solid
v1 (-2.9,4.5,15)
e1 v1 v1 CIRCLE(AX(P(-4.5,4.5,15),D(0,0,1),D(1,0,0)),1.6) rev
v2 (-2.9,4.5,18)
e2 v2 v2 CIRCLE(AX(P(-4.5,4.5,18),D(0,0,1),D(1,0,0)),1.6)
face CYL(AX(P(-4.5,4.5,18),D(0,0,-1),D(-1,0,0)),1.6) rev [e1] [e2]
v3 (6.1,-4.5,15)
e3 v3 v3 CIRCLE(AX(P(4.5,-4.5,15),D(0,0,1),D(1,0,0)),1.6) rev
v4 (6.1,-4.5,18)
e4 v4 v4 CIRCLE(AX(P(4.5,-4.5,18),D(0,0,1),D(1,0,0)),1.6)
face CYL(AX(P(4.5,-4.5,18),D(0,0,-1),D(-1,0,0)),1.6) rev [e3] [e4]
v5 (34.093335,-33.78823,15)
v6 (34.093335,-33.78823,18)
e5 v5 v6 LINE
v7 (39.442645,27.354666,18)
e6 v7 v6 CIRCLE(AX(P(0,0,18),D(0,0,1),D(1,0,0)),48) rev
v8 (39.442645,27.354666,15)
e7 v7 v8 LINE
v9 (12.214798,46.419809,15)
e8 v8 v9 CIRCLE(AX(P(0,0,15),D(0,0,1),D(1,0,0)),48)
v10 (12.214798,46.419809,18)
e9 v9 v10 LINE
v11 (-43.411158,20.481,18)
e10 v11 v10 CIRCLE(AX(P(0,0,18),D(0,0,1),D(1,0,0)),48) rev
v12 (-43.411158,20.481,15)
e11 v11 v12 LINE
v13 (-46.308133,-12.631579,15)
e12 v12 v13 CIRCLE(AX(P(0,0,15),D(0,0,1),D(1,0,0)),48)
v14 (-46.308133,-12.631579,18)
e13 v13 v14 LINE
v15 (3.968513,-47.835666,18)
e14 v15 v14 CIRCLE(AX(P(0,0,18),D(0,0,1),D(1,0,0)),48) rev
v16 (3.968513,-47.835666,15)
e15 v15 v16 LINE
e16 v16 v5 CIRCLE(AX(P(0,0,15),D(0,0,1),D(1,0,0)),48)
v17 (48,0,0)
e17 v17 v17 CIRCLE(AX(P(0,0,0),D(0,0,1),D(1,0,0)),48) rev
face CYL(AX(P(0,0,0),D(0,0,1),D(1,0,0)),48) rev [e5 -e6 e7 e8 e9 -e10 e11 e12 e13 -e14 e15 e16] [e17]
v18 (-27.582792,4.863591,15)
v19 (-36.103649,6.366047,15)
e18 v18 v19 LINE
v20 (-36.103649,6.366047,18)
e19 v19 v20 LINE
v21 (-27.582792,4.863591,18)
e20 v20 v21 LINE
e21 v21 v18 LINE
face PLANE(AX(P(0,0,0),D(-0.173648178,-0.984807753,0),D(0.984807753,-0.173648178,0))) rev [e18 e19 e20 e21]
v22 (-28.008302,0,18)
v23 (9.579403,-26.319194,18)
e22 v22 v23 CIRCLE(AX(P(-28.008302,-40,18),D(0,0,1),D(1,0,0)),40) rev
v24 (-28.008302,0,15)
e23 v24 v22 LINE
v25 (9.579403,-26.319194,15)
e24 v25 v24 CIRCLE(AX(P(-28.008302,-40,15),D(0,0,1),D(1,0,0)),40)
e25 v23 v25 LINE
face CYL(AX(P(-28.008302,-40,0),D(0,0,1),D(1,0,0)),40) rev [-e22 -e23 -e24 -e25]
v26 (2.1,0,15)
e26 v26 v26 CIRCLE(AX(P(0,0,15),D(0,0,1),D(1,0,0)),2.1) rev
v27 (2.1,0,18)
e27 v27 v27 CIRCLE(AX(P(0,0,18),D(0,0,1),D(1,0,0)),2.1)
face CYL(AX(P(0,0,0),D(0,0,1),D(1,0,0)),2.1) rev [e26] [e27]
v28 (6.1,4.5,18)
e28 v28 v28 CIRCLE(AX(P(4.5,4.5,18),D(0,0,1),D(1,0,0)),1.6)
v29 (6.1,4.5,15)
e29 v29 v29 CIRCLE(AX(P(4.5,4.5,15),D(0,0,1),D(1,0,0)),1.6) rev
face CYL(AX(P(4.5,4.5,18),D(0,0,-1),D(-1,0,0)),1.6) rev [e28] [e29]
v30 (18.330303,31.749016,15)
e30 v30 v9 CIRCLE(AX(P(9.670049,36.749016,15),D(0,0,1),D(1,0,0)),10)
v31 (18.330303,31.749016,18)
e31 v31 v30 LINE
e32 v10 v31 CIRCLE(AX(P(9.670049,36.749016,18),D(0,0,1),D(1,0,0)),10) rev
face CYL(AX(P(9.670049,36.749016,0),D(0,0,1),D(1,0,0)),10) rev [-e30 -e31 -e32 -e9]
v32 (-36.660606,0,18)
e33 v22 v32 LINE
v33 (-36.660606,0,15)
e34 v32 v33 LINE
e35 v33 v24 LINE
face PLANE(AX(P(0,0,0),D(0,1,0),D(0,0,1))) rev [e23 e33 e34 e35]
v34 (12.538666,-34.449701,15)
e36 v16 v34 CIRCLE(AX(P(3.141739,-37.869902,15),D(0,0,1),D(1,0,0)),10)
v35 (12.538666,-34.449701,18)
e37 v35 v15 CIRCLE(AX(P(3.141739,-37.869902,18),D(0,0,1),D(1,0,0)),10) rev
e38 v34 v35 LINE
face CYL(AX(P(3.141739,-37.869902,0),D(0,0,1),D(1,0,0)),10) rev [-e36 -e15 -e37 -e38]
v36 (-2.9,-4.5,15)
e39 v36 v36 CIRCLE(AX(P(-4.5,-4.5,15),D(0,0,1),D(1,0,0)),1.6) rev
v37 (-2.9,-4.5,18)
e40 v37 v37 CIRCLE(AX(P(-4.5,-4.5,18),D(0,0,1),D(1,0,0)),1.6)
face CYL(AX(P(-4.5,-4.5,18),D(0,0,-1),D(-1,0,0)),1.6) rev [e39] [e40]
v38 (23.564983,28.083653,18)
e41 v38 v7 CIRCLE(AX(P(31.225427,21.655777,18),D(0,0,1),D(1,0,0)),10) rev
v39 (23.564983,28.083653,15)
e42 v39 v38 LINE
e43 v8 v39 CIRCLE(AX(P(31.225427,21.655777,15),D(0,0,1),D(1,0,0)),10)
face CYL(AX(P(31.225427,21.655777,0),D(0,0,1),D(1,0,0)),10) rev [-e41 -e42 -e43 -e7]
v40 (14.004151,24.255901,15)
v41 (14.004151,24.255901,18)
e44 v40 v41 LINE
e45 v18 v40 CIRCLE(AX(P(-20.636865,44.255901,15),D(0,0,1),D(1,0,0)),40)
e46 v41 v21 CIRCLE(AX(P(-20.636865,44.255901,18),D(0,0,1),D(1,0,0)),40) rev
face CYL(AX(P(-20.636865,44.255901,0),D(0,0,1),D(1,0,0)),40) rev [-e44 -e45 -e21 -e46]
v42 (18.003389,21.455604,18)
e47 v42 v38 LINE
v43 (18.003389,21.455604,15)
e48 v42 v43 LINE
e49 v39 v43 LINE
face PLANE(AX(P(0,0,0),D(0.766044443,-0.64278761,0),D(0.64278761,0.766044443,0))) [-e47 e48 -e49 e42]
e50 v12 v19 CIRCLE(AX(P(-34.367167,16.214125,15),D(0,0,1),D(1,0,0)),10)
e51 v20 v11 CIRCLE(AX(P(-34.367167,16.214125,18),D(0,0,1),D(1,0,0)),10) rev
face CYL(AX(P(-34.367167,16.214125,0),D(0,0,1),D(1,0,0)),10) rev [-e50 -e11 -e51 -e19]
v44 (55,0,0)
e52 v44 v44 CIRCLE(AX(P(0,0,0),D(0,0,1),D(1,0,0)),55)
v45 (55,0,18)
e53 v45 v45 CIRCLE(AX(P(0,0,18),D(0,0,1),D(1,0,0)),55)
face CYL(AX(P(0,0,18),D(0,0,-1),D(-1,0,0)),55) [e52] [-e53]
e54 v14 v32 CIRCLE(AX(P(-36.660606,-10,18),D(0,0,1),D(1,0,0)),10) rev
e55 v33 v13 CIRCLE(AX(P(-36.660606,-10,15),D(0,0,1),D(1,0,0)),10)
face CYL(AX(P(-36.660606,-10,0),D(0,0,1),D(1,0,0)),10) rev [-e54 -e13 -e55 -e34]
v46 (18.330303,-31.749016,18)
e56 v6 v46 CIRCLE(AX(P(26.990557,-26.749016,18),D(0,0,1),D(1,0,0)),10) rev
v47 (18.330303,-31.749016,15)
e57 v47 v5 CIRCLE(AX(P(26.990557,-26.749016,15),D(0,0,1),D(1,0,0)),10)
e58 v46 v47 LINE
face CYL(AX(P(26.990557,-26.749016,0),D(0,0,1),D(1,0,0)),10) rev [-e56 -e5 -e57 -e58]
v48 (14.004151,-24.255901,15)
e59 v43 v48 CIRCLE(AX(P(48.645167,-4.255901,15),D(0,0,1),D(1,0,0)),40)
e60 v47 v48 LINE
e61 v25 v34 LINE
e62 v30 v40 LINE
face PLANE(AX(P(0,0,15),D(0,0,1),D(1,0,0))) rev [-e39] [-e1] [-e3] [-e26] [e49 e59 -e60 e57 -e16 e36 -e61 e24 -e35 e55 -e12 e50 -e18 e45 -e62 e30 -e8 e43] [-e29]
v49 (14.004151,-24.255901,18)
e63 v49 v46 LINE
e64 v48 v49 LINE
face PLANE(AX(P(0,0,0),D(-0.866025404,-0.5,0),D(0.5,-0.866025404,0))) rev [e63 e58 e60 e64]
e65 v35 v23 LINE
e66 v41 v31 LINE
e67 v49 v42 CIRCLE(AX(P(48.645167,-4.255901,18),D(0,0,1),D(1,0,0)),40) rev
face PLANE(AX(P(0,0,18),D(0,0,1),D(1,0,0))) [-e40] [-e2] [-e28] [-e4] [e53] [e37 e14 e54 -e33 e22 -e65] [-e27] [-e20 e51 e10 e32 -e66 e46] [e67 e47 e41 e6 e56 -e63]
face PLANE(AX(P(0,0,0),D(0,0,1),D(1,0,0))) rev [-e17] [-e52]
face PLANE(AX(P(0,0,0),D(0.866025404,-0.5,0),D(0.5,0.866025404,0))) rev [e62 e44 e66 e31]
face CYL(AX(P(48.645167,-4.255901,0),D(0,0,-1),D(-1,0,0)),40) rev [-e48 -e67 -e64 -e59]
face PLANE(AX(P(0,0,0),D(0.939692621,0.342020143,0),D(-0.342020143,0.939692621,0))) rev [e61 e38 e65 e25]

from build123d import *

# Parameters (mm, degrees)
ESQUISSE1_R             = 55
BOSS_EXTRU_1_DEPTH      = 18
ESQUISSE2_R             = 2.1
ENL_V_MAT_EXTRU_1_DEPTH = 80.837334625
ENL_V_MAT_EXTRU_2_DEPTH = 80.837334625
ENL_V_MAT_EXTRU_3_DEPTH = 80.837334625
ENL_V_START             = 15
ESQUISSE8_R             = 48
ENL_V_MAT_EXTRU_4_DEPTH = 15
CONG_3_R                = 10
CONG_4_R                = 10
CONG_5_R                = 60
CONG_7_R                = 40
ESQUISSE10_R            = 1.6
ENL_V_MAT_EXTRU_9_DEPTH = 80.837334785


with BuildPart() as part:
    # Esquisse1 → Boss.-Extru.1 (new body)
    with BuildSketch(Plane.XY):
        Circle(ESQUISSE1_R)
    extrude(amount=BOSS_EXTRU_1_DEPTH)

    # Esquisse2 → Enlèv. mat.-Extru.1 (cut, through all)
    with BuildSketch(Plane.XY.offset(18)):
        Circle(ESQUISSE2_R)
    extrude(amount=-ENL_V_MAT_EXTRU_1_DEPTH, mode=Mode.SUBTRACT)

    # Esquisse3 → Enlèv. mat.-Extru.2 (cut, through all)
    with BuildSketch(Plane.XY.offset(18)):
        with BuildLine():
            ThreePointArc((-7.5, 0), (-4.301823273, -6.143640332), (2.565151075, -7.047694656))
            Line((2.565151075, -7.047694656), (16.41696688, -45.105245798))
            ThreePointArc((16.41696688, -45.105245798), (-27.531668945, -39.319298126), (-48, 0))
            Line((-48, 0), (-7.5, 0))
        make_face()
        with BuildLine():
            ThreePointArc((-47.270772145, 8.335112528), (-20.285676564, 43.502773778), (24, 41.569219382))
            Line((24, 41.569219382), (3.75, 6.495190528))
            ThreePointArc((3.75, 6.495190528), (-3.169636963, 6.797308403), (-7.386058148, 1.302361333))
            Line((-7.386058148, 1.302361333), (-47.270772145, 8.335112528))
        make_face()
        with BuildLine():
            ThreePointArc((30.853805265, 36.77013327), (47.817345508, -4.183475652), (24, -41.569219382))
            Line((24, -41.569219382), (3.75, -6.495190528))
            ThreePointArc((3.75, -6.495190528), (7.471460236, -0.653668071), (4.820907073, 5.745333323))
            Line((4.820907073, 5.745333323), (30.853805265, 36.77013327))
        make_face()
    extrude(amount=-ENL_V_MAT_EXTRU_2_DEPTH, mode=Mode.SUBTRACT)

    # Esquisse7 → Enlèv. mat.-Extru.3 (cut, through all)
    with BuildSketch(Plane.XY):
        with BuildLine():
            Line((2.565151075, -7.047694656), (-27.531668945, -39.319298126))
            Line((-27.531668945, -39.319298126), (-7.5, 0))
            ThreePointArc((-7.5, 0), (-3.331557771, -4.75795759), (2.565151075, -7.047694656))
        make_face()
        with BuildLine():
            Line((4.820907073, 5.745333323), (47.817345508, -4.183475652))
            Line((47.817345508, -4.183475652), (3.75, -6.495190528))
            ThreePointArc((3.75, -6.495190528), (5.786291029, -0.506234869), (4.820907073, 5.745333323))
        make_face()
        with BuildLine():
            Line((3.75, 6.495190528), (-20.285676564, 43.502773778))
            Line((-20.285676564, 43.502773778), (-7.386058148, 1.302361333))
            ThreePointArc((-7.386058148, 1.302361333), (-2.454733258, 5.264192459), (3.75, 6.495190528))
        make_face()
    extrude(amount=ENL_V_MAT_EXTRU_3_DEPTH, mode=Mode.SUBTRACT)

    # Esquisse8 → Enlèv. mat.-Extru.4 (cut)
    with BuildSketch(Plane.XY.offset(ENL_V_START)):
        Circle(ESQUISSE8_R)
    extrude(amount=-ENL_V_MAT_EXTRU_4_DEPTH, mode=Mode.SUBTRACT)

    # Congé3
    # the kernel refuses this fillet: 10 mm, written as the material it adds along each edge
    with BuildSketch(Plane(origin=(-47.270772145, 8.335112528, 18), x_dir=(0.3028483404391726, 0.9530387624295452, 0), z_dir=(0, 0, -1))) as cong_3_piece_1:
        with BuildLine():
            CenterArc((11.416839641, 9.911490246), CONG_3_R, 172.371238355, 105.25752329)
            Line((1.505349395, 11.239029739), (0, 0))
            ThreePointArc((0, 0), (6.372189567, -0.42484682), (12.744379134, 0))
        make_face()
    extrude(amount=3)
    with BuildSketch(Plane(origin=(24, 41.569219382, 18), x_dir=(-0.9247372088845717, 0.38060621973947306, 0), z_dir=(0, 0, -1)), Plane(origin=(24, -41.569219382, 18), x_dir=(0.7919832595750325, 0.6105428048490187, 0), z_dir=(0, 0, -1)), Plane(origin=(-48, 0, 18), x_dir=(0.13275394930954024, -0.9911490245884924, 0), z_dir=(0, 0, -1))) as cong_3_piece_2:
        with BuildLine():
            CenterArc((11.416839641, -9.911490246), CONG_3_R, 82.371238355, 105.25752329)
            Line((1.505349395, -11.239029739), (0, 0))
            ThreePointArc((0, 0), (6.372189567, 0.42484682), (12.744379134, 0))
        make_face()
    extrude(amount=3)
    with BuildSketch(Plane(origin=(16.41696688, -45.105245798, 18), x_dir=(-0.34202014332566844, 0.9396926207859085, 0), z_dir=(0, 0, -1))) as cong_3_piece_3:
        with BuildLine():
            CenterArc((11.33939444, -10), CONG_3_R, 90, 105.25752329)
            ThreePointArc((1.691866661, -12.631578947), (0.42484682, -6.372189567), (0, 0))
            Line((0, 0), (11.33939444, 0))
        make_face()
    extrude(amount=3)

    # Congé4
    # the kernel refuses this fillet: 10 mm, written as the material it adds along each edge
    with BuildSketch(Plane(origin=(30.853805265, 36.77013327, 18), x_dir=(0.6739316088356829, -0.7387937375290534, 0), z_dir=(0, 0, -1))) as cong_4_piece_1:
        with BuildLine():
            CenterArc((11.416839641, 9.911490246), CONG_4_R, 172.371238355, 105.25752329)
            Line((1.505349395, 11.239029739), (0, 0))
            ThreePointArc((0, 0), (6.372189567, -0.42484682), (12.744379134, 0))
        make_face()
    extrude(amount=3)

    # Congé5
    # the kernel refuses this fillet: 60 mm, written as the material it adds along each edge
    with BuildSketch(Plane(origin=(-7.386058148, 1.302361333, 18), x_dir=(0.8285733508252506, 0.5598805250249523, 0), z_dir=(0, 0, -1)), Plane(origin=(2.565151075, -7.047694656, 18), x_dir=(-0.8991574331684032, 0.4376253082009868, 0), z_dir=(0, 0, -1))) as cong_5_piece_1:
        with BuildLine():
            CenterArc((27.479152806, -56.896321194), CONG_5_R, 108.509321534, 25.538214121)
            Line((-14.236143248, -13.770527577), (0, 0))
            ThreePointArc((0, 0), (4.215808312, -0.686940021), (8.431616624, 0))
        make_face()
    extrude(amount=3)
    with BuildSketch(Plane(origin=(3.75, 6.495190528, 18), x_dir=(0.4999999999999999, 0.8660254037844387, 0), z_dir=(0, 0, -1)), Plane(origin=(-7.5, 0, 18), x_dir=(-1, 0, 0), z_dir=(0, 0, -1))) as cong_5_piece_2:
        with BuildLine():
            CenterArc((19.806443505, -60), CONG_5_R, 90, 25.538214121)
            ThreePointArc((-6.060335973, -5.862123061), (-2.552569547, -3.424808757), (0, 0))
            Line((0, 0), (19.806443505, 0))
        make_face()
    extrude(amount=3)
    with BuildSketch(Plane(origin=(4.820907073, 5.745333323, 18), x_dir=(0.6427876096865399, 0.7660444431189776, 0), z_dir=(0, 0, -1))) as cong_5_piece_3:
        with BuildLine():
            CenterArc((19.806443505, 60), CONG_5_R, 244.461785879, 25.538214121)
            ThreePointArc((-6.060335973, 5.862123061), (-2.552569547, 3.424808757), (0, 0))
            Line((0, 0), (19.806443505, 0))
        make_face()
    extrude(amount=3)
    with BuildSketch(Plane(origin=(3.75, -6.495190528, 18), x_dir=(0.24272682168261056, 0.9700946809646254, 0), z_dir=(0, 0, -1))) as cong_5_piece_4:
        with BuildLine():
            CenterArc((27.479152806, 56.896321194), CONG_5_R, 225.952464345, 25.538214121)
            Line((-14.236143248, 13.770527577), (0, 0))
            ThreePointArc((0, 0), (4.215808312, 0.686940021), (8.431616624, 0))
        make_face()
    extrude(amount=3)

    # Congé7
    cong_7_edges = [part.edges().sort_by_distance(p)[0] for p in [
        (-2.549741992, 5.467939348, 16.5),
        (6.010245378, -0.525828336, 16.5),
        (-3.460503385, -4.942111012, 16.5),
    ]]
    fillet(cong_7_edges, radius=CONG_7_R)

    # Esquisse10 → Enlèv. mat.-Extru.9 (cut, through all)
    with BuildSketch(Plane.XY):
        with Locations((-4.5, -4.5)):
            Circle(ESQUISSE10_R)
        with Locations((-4.5, 4.5)):
            Circle(ESQUISSE10_R)
        with Locations((4.5, 4.5)):
            Circle(ESQUISSE10_R)
        with Locations((4.5, -4.5)):
            Circle(ESQUISSE10_R)
    extrude(amount=ENL_V_MAT_EXTRU_9_DEPTH, mode=Mode.SUBTRACT)


solid = part.part
